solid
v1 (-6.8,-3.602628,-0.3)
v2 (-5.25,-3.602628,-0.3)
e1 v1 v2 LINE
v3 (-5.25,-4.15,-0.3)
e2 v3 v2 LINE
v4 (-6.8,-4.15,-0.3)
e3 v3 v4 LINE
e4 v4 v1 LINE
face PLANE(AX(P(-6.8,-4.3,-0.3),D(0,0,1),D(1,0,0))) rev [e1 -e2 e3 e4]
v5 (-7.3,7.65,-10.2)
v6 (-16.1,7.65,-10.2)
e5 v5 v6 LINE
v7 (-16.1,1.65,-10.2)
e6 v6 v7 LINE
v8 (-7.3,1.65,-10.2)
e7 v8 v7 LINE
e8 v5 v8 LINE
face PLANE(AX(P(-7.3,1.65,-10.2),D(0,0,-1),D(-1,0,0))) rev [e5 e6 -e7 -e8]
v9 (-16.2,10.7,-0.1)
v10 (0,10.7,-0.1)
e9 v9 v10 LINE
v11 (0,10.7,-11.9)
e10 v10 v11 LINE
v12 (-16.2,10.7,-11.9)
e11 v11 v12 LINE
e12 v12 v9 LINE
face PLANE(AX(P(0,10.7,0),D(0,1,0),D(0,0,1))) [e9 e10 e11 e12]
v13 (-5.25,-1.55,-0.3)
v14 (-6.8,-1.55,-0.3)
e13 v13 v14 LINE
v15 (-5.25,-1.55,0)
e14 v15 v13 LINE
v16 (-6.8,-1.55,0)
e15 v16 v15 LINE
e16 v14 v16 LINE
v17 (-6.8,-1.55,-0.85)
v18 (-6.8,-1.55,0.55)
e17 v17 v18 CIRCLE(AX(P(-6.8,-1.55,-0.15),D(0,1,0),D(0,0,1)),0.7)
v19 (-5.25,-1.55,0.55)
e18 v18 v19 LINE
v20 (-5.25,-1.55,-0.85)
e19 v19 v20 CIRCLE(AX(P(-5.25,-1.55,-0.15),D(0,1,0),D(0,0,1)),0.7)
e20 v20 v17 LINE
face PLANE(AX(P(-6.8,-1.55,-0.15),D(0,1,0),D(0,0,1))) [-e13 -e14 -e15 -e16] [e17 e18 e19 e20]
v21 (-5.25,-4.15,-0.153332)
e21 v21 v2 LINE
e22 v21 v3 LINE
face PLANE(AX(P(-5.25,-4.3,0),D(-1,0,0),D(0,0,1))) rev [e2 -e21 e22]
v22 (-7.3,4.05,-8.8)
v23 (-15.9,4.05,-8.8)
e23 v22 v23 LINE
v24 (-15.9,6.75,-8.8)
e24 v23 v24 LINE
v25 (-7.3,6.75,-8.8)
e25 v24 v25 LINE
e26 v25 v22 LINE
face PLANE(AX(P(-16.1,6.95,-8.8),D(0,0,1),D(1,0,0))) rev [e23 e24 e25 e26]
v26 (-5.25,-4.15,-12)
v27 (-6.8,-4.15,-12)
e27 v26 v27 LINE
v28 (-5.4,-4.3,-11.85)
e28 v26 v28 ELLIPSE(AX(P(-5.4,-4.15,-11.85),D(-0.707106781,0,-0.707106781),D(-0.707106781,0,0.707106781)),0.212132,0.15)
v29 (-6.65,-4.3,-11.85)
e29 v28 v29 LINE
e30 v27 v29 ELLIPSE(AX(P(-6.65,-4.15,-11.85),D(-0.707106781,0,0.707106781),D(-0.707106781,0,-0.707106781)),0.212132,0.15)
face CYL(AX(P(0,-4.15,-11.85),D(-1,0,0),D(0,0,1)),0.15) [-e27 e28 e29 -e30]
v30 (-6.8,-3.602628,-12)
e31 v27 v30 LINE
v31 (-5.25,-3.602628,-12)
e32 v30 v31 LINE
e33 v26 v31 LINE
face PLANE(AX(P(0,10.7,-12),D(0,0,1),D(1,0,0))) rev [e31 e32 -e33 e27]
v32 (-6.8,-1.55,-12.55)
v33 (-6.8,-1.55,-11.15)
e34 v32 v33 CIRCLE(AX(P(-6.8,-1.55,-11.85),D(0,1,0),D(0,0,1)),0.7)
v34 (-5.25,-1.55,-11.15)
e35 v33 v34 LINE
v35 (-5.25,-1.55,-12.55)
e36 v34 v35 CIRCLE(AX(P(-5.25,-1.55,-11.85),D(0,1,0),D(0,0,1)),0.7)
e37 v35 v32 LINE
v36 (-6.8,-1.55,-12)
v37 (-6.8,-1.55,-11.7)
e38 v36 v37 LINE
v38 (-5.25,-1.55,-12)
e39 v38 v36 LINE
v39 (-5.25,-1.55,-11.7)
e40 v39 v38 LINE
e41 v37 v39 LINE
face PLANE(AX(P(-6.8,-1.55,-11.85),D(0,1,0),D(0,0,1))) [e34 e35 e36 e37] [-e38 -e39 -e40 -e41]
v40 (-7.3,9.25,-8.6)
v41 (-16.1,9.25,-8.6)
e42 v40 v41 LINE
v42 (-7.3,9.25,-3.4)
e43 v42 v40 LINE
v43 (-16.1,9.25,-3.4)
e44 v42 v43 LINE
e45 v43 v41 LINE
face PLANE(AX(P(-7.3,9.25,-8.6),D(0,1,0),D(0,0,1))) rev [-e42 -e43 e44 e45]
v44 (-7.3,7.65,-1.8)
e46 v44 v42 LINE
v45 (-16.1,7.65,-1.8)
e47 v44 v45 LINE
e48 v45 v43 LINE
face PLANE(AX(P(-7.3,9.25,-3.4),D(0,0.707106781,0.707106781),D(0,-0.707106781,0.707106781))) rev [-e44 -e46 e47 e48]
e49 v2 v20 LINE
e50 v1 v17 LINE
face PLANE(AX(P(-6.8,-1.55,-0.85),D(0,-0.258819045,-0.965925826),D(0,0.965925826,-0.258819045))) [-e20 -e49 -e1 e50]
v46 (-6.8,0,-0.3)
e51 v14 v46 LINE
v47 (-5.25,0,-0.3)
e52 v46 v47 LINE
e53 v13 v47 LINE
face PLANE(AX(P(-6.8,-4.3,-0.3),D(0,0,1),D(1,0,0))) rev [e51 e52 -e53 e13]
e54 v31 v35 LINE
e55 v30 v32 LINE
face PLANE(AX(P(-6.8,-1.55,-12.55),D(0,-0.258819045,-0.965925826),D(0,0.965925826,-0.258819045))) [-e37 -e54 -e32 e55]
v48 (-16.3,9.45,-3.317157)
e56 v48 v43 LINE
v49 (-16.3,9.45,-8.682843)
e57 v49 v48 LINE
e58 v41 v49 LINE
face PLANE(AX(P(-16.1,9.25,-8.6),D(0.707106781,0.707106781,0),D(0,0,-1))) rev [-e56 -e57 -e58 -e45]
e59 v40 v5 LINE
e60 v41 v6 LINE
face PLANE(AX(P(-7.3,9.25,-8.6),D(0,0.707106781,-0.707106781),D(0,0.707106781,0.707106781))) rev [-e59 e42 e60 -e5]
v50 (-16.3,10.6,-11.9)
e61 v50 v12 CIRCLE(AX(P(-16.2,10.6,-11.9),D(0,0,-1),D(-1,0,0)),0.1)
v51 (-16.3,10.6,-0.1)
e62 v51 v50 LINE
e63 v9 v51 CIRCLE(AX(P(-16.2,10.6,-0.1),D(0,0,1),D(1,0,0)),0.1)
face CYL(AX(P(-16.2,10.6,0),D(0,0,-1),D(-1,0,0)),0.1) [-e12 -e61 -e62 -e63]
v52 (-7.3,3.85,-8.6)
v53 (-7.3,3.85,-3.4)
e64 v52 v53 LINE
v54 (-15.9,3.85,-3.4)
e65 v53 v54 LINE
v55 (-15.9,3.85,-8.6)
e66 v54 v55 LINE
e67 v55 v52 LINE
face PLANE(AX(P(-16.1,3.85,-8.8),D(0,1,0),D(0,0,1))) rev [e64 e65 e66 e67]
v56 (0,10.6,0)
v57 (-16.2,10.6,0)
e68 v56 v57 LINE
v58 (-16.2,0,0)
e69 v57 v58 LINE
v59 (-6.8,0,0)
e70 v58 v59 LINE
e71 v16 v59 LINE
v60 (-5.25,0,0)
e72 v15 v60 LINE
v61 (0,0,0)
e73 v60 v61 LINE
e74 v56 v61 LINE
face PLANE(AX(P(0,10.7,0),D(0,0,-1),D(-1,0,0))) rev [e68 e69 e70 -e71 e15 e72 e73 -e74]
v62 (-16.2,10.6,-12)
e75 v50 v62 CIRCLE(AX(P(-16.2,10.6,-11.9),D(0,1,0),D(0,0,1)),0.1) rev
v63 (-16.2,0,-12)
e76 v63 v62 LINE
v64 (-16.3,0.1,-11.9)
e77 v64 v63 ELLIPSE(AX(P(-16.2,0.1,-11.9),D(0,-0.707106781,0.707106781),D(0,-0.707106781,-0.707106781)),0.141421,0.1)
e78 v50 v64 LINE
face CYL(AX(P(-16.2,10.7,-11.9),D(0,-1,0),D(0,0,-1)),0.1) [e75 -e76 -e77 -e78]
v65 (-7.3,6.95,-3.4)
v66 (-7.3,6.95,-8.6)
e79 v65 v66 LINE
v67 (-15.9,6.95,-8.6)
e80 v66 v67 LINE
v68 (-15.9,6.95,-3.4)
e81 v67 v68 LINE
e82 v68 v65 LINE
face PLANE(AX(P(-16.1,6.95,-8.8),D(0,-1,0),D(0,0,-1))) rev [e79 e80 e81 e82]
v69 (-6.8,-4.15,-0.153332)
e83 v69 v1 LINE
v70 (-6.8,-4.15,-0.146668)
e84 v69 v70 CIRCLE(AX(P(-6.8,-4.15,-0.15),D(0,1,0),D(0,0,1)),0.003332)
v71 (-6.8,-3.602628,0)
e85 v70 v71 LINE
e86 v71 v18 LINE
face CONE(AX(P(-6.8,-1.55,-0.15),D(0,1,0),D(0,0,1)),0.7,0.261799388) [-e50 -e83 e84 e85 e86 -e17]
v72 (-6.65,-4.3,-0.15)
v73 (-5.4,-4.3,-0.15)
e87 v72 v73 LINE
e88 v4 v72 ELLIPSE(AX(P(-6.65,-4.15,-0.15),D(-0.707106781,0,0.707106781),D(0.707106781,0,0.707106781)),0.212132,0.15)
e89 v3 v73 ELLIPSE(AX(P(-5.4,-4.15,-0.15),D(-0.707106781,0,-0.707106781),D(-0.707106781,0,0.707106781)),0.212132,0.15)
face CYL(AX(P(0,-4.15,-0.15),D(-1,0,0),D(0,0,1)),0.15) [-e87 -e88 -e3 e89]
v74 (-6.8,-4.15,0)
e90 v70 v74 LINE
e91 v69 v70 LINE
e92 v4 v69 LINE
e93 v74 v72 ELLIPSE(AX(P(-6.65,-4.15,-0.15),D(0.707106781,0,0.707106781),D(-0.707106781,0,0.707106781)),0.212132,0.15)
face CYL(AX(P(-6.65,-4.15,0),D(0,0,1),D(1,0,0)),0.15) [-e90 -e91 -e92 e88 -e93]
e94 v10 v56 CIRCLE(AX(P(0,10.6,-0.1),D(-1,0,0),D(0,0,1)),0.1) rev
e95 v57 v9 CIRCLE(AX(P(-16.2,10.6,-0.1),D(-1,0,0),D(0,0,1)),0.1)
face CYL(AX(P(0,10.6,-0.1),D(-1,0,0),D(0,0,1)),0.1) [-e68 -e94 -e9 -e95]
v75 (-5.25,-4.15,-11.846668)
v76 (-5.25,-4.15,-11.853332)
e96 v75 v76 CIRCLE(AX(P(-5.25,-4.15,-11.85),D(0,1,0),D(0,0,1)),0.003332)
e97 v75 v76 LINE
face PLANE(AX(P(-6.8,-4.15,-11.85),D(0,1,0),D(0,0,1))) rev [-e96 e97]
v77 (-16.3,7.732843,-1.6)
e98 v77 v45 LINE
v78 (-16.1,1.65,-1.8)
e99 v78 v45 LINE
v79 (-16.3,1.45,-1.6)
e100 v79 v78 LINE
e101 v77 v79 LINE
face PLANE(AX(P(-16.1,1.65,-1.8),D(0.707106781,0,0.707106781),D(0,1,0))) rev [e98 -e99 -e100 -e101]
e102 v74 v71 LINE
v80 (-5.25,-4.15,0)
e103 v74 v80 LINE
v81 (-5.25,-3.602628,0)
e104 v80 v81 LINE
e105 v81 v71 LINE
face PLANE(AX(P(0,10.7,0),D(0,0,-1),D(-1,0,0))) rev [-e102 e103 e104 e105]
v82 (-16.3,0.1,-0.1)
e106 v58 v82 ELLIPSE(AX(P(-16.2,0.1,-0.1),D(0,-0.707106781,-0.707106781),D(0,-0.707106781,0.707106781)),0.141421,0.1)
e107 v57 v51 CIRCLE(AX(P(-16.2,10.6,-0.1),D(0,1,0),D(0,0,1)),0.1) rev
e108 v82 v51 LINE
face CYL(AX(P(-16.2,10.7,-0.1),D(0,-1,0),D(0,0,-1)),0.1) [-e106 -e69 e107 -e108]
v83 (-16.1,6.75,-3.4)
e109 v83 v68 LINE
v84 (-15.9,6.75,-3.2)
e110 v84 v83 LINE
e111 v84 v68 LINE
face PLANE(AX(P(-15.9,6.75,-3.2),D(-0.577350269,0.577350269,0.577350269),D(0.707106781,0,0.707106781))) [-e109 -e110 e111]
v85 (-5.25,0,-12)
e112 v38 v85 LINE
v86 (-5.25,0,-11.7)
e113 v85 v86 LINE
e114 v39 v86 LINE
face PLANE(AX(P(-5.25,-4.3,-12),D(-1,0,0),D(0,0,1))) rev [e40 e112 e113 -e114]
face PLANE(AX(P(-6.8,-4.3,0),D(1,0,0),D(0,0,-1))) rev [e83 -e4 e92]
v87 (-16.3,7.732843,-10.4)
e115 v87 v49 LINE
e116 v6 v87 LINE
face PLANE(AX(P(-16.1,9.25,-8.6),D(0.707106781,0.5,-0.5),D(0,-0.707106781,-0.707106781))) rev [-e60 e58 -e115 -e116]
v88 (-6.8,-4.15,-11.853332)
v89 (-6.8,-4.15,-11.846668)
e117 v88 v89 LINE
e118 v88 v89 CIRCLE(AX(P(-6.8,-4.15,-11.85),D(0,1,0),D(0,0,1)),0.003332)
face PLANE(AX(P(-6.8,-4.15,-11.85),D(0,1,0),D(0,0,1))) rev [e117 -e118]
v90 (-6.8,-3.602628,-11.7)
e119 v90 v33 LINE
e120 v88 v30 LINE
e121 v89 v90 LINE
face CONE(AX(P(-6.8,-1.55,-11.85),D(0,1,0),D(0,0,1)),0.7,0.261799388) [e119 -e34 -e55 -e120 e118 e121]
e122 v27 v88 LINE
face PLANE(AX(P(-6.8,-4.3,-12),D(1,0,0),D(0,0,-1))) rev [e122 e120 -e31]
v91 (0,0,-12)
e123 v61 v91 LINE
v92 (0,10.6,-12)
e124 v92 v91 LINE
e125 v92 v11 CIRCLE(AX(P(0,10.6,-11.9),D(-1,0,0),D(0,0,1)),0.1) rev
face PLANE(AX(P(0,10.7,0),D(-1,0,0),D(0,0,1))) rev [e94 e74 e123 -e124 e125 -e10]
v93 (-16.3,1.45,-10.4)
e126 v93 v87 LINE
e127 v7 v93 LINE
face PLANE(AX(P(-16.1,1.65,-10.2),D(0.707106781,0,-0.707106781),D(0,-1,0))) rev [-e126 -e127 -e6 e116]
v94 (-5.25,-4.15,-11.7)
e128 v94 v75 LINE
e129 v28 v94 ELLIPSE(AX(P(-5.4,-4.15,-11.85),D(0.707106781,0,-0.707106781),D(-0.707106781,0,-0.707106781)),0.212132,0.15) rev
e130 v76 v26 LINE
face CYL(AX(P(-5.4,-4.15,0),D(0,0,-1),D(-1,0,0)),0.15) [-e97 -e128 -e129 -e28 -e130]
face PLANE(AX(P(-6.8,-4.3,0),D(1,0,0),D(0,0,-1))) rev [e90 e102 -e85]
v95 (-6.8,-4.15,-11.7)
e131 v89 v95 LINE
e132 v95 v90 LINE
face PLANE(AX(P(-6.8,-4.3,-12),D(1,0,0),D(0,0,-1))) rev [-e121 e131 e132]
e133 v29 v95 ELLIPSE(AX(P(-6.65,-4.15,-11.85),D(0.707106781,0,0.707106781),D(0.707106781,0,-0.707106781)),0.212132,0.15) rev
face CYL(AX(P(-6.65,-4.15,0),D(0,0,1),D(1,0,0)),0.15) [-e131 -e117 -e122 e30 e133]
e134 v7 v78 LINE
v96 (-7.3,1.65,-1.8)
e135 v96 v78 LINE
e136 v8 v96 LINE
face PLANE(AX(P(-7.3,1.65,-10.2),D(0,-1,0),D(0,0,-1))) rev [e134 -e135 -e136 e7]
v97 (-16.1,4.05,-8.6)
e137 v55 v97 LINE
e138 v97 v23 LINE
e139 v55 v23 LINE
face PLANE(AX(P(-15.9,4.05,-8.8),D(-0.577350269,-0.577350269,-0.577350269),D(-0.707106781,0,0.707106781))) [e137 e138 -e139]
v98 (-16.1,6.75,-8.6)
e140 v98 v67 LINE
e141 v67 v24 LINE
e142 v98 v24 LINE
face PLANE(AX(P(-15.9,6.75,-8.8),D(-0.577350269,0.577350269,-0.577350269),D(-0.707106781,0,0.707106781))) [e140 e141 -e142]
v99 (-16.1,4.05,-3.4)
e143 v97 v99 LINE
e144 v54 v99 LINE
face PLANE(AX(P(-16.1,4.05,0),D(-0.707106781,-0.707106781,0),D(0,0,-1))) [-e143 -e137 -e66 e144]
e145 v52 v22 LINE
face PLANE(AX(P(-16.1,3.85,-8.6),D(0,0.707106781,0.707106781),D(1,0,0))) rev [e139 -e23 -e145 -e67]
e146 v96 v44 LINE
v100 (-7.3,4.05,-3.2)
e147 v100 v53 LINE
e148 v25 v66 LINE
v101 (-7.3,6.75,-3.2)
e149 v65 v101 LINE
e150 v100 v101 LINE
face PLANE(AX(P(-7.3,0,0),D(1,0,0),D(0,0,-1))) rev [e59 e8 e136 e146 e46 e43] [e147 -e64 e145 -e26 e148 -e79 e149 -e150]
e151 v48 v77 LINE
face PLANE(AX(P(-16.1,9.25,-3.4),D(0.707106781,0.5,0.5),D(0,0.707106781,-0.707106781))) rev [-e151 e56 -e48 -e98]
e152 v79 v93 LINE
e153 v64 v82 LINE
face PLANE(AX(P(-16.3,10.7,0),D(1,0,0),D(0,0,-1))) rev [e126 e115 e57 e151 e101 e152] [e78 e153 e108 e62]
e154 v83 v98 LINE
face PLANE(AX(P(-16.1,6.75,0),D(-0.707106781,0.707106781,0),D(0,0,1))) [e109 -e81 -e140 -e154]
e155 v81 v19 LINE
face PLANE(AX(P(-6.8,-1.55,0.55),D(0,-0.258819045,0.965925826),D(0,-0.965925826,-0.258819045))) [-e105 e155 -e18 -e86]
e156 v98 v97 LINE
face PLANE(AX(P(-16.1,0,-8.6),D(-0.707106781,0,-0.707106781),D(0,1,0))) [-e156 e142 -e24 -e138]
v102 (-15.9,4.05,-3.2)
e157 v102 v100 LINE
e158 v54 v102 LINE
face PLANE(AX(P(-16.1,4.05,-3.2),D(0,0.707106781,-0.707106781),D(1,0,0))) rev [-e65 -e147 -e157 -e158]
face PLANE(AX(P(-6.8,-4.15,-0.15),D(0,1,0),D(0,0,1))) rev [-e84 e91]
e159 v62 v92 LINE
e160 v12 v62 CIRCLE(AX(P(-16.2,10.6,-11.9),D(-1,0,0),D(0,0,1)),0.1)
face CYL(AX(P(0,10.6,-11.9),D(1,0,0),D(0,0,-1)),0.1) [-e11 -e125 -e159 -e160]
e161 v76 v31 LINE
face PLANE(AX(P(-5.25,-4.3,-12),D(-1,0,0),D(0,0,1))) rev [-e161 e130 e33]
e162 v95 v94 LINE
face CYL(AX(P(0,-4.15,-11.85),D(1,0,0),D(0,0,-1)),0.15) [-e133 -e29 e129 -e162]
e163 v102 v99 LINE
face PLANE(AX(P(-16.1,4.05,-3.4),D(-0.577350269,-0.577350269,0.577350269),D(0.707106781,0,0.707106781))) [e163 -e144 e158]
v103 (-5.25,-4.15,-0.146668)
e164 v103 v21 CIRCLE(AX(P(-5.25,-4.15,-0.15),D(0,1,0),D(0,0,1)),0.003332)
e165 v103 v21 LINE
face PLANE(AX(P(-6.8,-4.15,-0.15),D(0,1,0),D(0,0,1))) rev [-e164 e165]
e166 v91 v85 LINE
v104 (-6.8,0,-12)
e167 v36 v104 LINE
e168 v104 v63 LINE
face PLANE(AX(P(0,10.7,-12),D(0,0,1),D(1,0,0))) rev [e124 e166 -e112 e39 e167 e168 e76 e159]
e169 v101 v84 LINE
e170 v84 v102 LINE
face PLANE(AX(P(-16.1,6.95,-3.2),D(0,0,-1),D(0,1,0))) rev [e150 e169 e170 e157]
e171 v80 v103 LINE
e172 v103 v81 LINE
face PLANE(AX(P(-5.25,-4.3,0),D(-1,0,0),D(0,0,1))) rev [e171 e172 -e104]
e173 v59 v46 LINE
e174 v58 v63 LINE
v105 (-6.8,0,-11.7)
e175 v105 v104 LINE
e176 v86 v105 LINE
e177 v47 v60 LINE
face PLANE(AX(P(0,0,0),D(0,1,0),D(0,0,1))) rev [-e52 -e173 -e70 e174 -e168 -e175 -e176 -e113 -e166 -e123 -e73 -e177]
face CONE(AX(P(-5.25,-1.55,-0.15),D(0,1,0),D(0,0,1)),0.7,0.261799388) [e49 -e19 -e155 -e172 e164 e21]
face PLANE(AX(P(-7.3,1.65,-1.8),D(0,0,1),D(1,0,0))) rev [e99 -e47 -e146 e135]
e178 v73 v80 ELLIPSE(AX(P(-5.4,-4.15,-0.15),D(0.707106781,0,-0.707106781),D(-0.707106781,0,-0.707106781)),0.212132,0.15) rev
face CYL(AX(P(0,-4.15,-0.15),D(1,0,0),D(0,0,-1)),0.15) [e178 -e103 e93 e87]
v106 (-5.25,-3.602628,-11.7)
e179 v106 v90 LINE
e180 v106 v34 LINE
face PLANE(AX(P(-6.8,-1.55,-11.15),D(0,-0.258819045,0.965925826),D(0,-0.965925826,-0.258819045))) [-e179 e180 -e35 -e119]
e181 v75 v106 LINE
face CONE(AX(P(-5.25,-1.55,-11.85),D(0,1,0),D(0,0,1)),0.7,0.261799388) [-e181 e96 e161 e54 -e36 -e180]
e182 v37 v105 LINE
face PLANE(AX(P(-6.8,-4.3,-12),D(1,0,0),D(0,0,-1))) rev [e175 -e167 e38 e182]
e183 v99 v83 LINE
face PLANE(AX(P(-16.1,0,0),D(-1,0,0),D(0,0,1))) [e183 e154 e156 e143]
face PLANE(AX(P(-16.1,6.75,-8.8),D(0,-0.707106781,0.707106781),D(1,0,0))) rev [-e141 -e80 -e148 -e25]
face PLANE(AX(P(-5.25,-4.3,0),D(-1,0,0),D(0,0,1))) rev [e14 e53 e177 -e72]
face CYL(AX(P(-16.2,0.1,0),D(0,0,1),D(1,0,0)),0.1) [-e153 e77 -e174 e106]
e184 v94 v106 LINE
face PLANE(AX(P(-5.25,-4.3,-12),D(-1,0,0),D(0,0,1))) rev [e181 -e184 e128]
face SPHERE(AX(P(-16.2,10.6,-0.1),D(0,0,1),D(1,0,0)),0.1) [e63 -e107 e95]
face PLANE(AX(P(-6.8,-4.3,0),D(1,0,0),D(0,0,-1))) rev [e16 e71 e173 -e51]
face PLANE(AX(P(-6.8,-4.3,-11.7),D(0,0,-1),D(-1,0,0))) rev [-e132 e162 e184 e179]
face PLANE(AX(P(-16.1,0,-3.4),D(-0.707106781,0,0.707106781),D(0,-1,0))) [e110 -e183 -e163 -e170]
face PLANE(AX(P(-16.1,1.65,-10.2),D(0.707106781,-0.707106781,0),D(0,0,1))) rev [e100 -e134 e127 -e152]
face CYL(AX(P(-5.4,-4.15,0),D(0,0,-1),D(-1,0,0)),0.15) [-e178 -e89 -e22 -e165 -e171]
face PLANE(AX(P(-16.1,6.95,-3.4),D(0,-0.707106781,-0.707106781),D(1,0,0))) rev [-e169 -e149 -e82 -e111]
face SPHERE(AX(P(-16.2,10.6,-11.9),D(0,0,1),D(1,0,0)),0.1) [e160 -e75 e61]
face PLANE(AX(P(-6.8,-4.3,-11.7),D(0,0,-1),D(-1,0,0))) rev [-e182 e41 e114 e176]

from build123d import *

# Parameters (mm, degrees)
ESQUISSE1_W                  = 16.3
ESQUISSE1_H                  = 12
BOSS_EXTRU_1_DEPTH           = 10.7
ENL_V_MAT_EXTRU_1_DEPTH      = 9
ESQUISSE4_W                  = 5.6
ESQUISSE4_H                  = 3.1
BOSS_EXTRU_2_DEPTH           = 8.8
CHANFREIN1_SIZE              = 0.2
CONG_1_R                     = 0.1
ESQUISSE5_W                  = 1.55
ESQUISSE5_H                  = 0.3
BOSS_EXTRU_3_DEPTH           = 4.3
BOSS_EXTRU_4_DEPTH           = 2.6
BOSS_EXTRU_4_DRAFT           = -15
BOSS_EXTRU_4_PROFILE_2_DEPTH = 2.6
BOSS_EXTRU_4_PROFILE_2_DRAFT = -15
CONG_3_R                     = 0.15


with BuildPart() as part:
    # Esquisse1 → Boss.-Extru.1 (new body)
    with BuildSketch(Plane(origin=(0, 0, 0), x_dir=(1, 0, 0), z_dir=(0, 1, 0))):
        with Locations((-8.15, 6)):
            Rectangle(ESQUISSE1_W, ESQUISSE1_H)
    extrude(amount=BOSS_EXTRU_1_DEPTH)

    # Esquisse2 → Enlèv. mat.-Extru.1 (cut)
    with BuildSketch(Plane.ZY.offset(16.3)):
        Polygon((-8.6, 9.25), (-10.2, 7.65), (-10.2, 1.65), (-1.8, 1.65), (-1.8, 7.65), (-3.4, 9.25), align=None)
    extrude(amount=-ENL_V_MAT_EXTRU_1_DEPTH, mode=Mode.SUBTRACT)

    # Esquisse4 → Boss.-Extru.2 (add)
    with BuildSketch(Plane.ZY.offset(7.3)):
        with Locations((-6, 5.4)):
            Rectangle(ESQUISSE4_W, ESQUISSE4_H)
    extrude(amount=BOSS_EXTRU_2_DEPTH)

    # Chanfrein1
    chanfrein1_edges = [part.edges().sort_by_distance(p)[0] for p in [
        (-16.3, 4.65, -10.2),
        (-16.3, 1.65, -6),
        (-16.3, 4.65, -1.8),
        (-16.3, 8.45, -2.6),
        (-16.3, 9.25, -6),
        (-16.3, 8.45, -9.4),
        (-11.7, 6.95, -8.8),
        (-11.7, 3.85, -8.8),
        (-11.7, 3.85, -3.2),
        (-11.7, 6.95, -3.2),
        (-16.1, 5.4, -8.8),
        (-16.1, 3.85, -6),
        (-16.1, 5.4, -3.2),
        (-16.1, 6.95, -6),
    ]]
    chamfer(chanfrein1_edges, length=CHANFREIN1_SIZE)

    # Congé1
    cong_1_edges = [part.edges().sort_by_distance(p)[0] for p in [
        (-16.3, 10.7, -6),
        (-8.15, 10.7, 0),
        (-16.3, 0, -6),
        (-8.15, 10.7, -12),
        (-16.3, 5.35, 0),
        (-16.3, 5.35, -12),
    ]]
    fillet(cong_1_edges, radius=CONG_1_R)

    # Esquisse5 → Boss.-Extru.3 (add)
    with BuildSketch(Plane.XZ):
        with Locations((-6.025, -0.15)):
            Rectangle(ESQUISSE5_W, ESQUISSE5_H)
        with Locations((-6.025, -11.85)):
            Rectangle(ESQUISSE5_W, ESQUISSE5_H)
    extrude(amount=BOSS_EXTRU_3_DEPTH)


with BuildPart() as boss_extru_4_tool:
    # Esquisse6 → Boss.-Extru.4 (with draft: the straight prism first)
    with BuildSketch(Plane(origin=(0, -1.55, 0), x_dir=(1, 0, 0), z_dir=(0, 1, 0))):
        with BuildLine():
            ThreePointArc((-6.8, 0.85), (-7.5, 0.15), (-6.8, -0.55))
            Line((-6.8, -0.55), (-5.25, -0.55))
            ThreePointArc((-5.25, -0.55), (-4.55, 0.15), (-5.25, 0.85))
            Line((-5.25, 0.85), (-6.8, 0.85))
        make_face()
    extrude(amount=-BOSS_EXTRU_4_DEPTH)
    # Boss.-Extru.4: the draft: its side faces are tilted about the plane it starts from
    boss_extru_4_sides = [boss_extru_4_tool.faces().sort_by_distance(p)[0] for p in [
        (-6.025, -2.85, 0.55),
        (-4.55, -2.85, -0.15),
        (-6.025, -2.85, -0.85),
        (-7.5, -2.85, -0.15),
    ]]
    draft(boss_extru_4_sides, Plane(origin=(0, -1.55, 0), x_dir=(1, 0, 0), z_dir=(0, 1, 0)), BOSS_EXTRU_4_DRAFT)


with BuildPart() as part_1:
    add(part.part)

    # Boss.-Extru.4: add boss_extru_4_tool
    add(boss_extru_4_tool.part)


with BuildPart() as boss_extru_4_profile_2_tool:
    # Esquisse6 → Boss.-Extru.4 profile 2 (with draft: the straight prism first)
    with BuildSketch(Plane(origin=(0, -1.55, 0), x_dir=(1, 0, 0), z_dir=(0, 1, 0))):
        with BuildLine():
            ThreePointArc((-6.8, 12.55), (-7.5, 11.85), (-6.8, 11.15))
            Line((-6.8, 11.15), (-5.25, 11.15))
            ThreePointArc((-5.25, 11.15), (-4.55, 11.85), (-5.25, 12.55))
            Line((-5.25, 12.55), (-6.8, 12.55))
        make_face()
    extrude(amount=-BOSS_EXTRU_4_PROFILE_2_DEPTH)
    # Boss.-Extru.4 profile 2: the draft: its side faces are tilted about the plane it starts from
    boss_extru_4_profile_2_sides = [boss_extru_4_profile_2_tool.faces().sort_by_distance(p)[0] for p in [
        (-7.5, -2.85, -11.85),
        (-6.025, -2.85, -11.15),
        (-4.55, -2.85, -11.85),
        (-6.025, -2.85, -12.55),
    ]]
    draft(boss_extru_4_profile_2_sides, Plane(origin=(0, -1.55, 0), x_dir=(1, 0, 0), z_dir=(0, 1, 0)), BOSS_EXTRU_4_PROFILE_2_DRAFT)


with BuildPart() as part_2:
    add(part_1.part)

    # Boss.-Extru.4 profile 2: add boss_extru_4_profile_2_tool
    add(boss_extru_4_profile_2_tool.part)

    # Congé3
    cong_3_edges = [part_2.edges().sort_by_distance(p)[0] for p in [
        (-6.8, -4.3, -0.15),
        (-6.025, -4.3, -0.3),
        (-5.25, -4.3, -0.15),
        (-6.025, -4.3, 0),
        (-6.025, -4.3, -12),
        (-5.25, -4.3, -11.85),
        (-6.025, -4.3, -11.7),
        (-6.8, -4.3, -11.85),
    ]]
    fillet(cong_3_edges, radius=CONG_3_R - 0.0001)  # a hair under: the kernel refuses the full size


solid = part_2.part
